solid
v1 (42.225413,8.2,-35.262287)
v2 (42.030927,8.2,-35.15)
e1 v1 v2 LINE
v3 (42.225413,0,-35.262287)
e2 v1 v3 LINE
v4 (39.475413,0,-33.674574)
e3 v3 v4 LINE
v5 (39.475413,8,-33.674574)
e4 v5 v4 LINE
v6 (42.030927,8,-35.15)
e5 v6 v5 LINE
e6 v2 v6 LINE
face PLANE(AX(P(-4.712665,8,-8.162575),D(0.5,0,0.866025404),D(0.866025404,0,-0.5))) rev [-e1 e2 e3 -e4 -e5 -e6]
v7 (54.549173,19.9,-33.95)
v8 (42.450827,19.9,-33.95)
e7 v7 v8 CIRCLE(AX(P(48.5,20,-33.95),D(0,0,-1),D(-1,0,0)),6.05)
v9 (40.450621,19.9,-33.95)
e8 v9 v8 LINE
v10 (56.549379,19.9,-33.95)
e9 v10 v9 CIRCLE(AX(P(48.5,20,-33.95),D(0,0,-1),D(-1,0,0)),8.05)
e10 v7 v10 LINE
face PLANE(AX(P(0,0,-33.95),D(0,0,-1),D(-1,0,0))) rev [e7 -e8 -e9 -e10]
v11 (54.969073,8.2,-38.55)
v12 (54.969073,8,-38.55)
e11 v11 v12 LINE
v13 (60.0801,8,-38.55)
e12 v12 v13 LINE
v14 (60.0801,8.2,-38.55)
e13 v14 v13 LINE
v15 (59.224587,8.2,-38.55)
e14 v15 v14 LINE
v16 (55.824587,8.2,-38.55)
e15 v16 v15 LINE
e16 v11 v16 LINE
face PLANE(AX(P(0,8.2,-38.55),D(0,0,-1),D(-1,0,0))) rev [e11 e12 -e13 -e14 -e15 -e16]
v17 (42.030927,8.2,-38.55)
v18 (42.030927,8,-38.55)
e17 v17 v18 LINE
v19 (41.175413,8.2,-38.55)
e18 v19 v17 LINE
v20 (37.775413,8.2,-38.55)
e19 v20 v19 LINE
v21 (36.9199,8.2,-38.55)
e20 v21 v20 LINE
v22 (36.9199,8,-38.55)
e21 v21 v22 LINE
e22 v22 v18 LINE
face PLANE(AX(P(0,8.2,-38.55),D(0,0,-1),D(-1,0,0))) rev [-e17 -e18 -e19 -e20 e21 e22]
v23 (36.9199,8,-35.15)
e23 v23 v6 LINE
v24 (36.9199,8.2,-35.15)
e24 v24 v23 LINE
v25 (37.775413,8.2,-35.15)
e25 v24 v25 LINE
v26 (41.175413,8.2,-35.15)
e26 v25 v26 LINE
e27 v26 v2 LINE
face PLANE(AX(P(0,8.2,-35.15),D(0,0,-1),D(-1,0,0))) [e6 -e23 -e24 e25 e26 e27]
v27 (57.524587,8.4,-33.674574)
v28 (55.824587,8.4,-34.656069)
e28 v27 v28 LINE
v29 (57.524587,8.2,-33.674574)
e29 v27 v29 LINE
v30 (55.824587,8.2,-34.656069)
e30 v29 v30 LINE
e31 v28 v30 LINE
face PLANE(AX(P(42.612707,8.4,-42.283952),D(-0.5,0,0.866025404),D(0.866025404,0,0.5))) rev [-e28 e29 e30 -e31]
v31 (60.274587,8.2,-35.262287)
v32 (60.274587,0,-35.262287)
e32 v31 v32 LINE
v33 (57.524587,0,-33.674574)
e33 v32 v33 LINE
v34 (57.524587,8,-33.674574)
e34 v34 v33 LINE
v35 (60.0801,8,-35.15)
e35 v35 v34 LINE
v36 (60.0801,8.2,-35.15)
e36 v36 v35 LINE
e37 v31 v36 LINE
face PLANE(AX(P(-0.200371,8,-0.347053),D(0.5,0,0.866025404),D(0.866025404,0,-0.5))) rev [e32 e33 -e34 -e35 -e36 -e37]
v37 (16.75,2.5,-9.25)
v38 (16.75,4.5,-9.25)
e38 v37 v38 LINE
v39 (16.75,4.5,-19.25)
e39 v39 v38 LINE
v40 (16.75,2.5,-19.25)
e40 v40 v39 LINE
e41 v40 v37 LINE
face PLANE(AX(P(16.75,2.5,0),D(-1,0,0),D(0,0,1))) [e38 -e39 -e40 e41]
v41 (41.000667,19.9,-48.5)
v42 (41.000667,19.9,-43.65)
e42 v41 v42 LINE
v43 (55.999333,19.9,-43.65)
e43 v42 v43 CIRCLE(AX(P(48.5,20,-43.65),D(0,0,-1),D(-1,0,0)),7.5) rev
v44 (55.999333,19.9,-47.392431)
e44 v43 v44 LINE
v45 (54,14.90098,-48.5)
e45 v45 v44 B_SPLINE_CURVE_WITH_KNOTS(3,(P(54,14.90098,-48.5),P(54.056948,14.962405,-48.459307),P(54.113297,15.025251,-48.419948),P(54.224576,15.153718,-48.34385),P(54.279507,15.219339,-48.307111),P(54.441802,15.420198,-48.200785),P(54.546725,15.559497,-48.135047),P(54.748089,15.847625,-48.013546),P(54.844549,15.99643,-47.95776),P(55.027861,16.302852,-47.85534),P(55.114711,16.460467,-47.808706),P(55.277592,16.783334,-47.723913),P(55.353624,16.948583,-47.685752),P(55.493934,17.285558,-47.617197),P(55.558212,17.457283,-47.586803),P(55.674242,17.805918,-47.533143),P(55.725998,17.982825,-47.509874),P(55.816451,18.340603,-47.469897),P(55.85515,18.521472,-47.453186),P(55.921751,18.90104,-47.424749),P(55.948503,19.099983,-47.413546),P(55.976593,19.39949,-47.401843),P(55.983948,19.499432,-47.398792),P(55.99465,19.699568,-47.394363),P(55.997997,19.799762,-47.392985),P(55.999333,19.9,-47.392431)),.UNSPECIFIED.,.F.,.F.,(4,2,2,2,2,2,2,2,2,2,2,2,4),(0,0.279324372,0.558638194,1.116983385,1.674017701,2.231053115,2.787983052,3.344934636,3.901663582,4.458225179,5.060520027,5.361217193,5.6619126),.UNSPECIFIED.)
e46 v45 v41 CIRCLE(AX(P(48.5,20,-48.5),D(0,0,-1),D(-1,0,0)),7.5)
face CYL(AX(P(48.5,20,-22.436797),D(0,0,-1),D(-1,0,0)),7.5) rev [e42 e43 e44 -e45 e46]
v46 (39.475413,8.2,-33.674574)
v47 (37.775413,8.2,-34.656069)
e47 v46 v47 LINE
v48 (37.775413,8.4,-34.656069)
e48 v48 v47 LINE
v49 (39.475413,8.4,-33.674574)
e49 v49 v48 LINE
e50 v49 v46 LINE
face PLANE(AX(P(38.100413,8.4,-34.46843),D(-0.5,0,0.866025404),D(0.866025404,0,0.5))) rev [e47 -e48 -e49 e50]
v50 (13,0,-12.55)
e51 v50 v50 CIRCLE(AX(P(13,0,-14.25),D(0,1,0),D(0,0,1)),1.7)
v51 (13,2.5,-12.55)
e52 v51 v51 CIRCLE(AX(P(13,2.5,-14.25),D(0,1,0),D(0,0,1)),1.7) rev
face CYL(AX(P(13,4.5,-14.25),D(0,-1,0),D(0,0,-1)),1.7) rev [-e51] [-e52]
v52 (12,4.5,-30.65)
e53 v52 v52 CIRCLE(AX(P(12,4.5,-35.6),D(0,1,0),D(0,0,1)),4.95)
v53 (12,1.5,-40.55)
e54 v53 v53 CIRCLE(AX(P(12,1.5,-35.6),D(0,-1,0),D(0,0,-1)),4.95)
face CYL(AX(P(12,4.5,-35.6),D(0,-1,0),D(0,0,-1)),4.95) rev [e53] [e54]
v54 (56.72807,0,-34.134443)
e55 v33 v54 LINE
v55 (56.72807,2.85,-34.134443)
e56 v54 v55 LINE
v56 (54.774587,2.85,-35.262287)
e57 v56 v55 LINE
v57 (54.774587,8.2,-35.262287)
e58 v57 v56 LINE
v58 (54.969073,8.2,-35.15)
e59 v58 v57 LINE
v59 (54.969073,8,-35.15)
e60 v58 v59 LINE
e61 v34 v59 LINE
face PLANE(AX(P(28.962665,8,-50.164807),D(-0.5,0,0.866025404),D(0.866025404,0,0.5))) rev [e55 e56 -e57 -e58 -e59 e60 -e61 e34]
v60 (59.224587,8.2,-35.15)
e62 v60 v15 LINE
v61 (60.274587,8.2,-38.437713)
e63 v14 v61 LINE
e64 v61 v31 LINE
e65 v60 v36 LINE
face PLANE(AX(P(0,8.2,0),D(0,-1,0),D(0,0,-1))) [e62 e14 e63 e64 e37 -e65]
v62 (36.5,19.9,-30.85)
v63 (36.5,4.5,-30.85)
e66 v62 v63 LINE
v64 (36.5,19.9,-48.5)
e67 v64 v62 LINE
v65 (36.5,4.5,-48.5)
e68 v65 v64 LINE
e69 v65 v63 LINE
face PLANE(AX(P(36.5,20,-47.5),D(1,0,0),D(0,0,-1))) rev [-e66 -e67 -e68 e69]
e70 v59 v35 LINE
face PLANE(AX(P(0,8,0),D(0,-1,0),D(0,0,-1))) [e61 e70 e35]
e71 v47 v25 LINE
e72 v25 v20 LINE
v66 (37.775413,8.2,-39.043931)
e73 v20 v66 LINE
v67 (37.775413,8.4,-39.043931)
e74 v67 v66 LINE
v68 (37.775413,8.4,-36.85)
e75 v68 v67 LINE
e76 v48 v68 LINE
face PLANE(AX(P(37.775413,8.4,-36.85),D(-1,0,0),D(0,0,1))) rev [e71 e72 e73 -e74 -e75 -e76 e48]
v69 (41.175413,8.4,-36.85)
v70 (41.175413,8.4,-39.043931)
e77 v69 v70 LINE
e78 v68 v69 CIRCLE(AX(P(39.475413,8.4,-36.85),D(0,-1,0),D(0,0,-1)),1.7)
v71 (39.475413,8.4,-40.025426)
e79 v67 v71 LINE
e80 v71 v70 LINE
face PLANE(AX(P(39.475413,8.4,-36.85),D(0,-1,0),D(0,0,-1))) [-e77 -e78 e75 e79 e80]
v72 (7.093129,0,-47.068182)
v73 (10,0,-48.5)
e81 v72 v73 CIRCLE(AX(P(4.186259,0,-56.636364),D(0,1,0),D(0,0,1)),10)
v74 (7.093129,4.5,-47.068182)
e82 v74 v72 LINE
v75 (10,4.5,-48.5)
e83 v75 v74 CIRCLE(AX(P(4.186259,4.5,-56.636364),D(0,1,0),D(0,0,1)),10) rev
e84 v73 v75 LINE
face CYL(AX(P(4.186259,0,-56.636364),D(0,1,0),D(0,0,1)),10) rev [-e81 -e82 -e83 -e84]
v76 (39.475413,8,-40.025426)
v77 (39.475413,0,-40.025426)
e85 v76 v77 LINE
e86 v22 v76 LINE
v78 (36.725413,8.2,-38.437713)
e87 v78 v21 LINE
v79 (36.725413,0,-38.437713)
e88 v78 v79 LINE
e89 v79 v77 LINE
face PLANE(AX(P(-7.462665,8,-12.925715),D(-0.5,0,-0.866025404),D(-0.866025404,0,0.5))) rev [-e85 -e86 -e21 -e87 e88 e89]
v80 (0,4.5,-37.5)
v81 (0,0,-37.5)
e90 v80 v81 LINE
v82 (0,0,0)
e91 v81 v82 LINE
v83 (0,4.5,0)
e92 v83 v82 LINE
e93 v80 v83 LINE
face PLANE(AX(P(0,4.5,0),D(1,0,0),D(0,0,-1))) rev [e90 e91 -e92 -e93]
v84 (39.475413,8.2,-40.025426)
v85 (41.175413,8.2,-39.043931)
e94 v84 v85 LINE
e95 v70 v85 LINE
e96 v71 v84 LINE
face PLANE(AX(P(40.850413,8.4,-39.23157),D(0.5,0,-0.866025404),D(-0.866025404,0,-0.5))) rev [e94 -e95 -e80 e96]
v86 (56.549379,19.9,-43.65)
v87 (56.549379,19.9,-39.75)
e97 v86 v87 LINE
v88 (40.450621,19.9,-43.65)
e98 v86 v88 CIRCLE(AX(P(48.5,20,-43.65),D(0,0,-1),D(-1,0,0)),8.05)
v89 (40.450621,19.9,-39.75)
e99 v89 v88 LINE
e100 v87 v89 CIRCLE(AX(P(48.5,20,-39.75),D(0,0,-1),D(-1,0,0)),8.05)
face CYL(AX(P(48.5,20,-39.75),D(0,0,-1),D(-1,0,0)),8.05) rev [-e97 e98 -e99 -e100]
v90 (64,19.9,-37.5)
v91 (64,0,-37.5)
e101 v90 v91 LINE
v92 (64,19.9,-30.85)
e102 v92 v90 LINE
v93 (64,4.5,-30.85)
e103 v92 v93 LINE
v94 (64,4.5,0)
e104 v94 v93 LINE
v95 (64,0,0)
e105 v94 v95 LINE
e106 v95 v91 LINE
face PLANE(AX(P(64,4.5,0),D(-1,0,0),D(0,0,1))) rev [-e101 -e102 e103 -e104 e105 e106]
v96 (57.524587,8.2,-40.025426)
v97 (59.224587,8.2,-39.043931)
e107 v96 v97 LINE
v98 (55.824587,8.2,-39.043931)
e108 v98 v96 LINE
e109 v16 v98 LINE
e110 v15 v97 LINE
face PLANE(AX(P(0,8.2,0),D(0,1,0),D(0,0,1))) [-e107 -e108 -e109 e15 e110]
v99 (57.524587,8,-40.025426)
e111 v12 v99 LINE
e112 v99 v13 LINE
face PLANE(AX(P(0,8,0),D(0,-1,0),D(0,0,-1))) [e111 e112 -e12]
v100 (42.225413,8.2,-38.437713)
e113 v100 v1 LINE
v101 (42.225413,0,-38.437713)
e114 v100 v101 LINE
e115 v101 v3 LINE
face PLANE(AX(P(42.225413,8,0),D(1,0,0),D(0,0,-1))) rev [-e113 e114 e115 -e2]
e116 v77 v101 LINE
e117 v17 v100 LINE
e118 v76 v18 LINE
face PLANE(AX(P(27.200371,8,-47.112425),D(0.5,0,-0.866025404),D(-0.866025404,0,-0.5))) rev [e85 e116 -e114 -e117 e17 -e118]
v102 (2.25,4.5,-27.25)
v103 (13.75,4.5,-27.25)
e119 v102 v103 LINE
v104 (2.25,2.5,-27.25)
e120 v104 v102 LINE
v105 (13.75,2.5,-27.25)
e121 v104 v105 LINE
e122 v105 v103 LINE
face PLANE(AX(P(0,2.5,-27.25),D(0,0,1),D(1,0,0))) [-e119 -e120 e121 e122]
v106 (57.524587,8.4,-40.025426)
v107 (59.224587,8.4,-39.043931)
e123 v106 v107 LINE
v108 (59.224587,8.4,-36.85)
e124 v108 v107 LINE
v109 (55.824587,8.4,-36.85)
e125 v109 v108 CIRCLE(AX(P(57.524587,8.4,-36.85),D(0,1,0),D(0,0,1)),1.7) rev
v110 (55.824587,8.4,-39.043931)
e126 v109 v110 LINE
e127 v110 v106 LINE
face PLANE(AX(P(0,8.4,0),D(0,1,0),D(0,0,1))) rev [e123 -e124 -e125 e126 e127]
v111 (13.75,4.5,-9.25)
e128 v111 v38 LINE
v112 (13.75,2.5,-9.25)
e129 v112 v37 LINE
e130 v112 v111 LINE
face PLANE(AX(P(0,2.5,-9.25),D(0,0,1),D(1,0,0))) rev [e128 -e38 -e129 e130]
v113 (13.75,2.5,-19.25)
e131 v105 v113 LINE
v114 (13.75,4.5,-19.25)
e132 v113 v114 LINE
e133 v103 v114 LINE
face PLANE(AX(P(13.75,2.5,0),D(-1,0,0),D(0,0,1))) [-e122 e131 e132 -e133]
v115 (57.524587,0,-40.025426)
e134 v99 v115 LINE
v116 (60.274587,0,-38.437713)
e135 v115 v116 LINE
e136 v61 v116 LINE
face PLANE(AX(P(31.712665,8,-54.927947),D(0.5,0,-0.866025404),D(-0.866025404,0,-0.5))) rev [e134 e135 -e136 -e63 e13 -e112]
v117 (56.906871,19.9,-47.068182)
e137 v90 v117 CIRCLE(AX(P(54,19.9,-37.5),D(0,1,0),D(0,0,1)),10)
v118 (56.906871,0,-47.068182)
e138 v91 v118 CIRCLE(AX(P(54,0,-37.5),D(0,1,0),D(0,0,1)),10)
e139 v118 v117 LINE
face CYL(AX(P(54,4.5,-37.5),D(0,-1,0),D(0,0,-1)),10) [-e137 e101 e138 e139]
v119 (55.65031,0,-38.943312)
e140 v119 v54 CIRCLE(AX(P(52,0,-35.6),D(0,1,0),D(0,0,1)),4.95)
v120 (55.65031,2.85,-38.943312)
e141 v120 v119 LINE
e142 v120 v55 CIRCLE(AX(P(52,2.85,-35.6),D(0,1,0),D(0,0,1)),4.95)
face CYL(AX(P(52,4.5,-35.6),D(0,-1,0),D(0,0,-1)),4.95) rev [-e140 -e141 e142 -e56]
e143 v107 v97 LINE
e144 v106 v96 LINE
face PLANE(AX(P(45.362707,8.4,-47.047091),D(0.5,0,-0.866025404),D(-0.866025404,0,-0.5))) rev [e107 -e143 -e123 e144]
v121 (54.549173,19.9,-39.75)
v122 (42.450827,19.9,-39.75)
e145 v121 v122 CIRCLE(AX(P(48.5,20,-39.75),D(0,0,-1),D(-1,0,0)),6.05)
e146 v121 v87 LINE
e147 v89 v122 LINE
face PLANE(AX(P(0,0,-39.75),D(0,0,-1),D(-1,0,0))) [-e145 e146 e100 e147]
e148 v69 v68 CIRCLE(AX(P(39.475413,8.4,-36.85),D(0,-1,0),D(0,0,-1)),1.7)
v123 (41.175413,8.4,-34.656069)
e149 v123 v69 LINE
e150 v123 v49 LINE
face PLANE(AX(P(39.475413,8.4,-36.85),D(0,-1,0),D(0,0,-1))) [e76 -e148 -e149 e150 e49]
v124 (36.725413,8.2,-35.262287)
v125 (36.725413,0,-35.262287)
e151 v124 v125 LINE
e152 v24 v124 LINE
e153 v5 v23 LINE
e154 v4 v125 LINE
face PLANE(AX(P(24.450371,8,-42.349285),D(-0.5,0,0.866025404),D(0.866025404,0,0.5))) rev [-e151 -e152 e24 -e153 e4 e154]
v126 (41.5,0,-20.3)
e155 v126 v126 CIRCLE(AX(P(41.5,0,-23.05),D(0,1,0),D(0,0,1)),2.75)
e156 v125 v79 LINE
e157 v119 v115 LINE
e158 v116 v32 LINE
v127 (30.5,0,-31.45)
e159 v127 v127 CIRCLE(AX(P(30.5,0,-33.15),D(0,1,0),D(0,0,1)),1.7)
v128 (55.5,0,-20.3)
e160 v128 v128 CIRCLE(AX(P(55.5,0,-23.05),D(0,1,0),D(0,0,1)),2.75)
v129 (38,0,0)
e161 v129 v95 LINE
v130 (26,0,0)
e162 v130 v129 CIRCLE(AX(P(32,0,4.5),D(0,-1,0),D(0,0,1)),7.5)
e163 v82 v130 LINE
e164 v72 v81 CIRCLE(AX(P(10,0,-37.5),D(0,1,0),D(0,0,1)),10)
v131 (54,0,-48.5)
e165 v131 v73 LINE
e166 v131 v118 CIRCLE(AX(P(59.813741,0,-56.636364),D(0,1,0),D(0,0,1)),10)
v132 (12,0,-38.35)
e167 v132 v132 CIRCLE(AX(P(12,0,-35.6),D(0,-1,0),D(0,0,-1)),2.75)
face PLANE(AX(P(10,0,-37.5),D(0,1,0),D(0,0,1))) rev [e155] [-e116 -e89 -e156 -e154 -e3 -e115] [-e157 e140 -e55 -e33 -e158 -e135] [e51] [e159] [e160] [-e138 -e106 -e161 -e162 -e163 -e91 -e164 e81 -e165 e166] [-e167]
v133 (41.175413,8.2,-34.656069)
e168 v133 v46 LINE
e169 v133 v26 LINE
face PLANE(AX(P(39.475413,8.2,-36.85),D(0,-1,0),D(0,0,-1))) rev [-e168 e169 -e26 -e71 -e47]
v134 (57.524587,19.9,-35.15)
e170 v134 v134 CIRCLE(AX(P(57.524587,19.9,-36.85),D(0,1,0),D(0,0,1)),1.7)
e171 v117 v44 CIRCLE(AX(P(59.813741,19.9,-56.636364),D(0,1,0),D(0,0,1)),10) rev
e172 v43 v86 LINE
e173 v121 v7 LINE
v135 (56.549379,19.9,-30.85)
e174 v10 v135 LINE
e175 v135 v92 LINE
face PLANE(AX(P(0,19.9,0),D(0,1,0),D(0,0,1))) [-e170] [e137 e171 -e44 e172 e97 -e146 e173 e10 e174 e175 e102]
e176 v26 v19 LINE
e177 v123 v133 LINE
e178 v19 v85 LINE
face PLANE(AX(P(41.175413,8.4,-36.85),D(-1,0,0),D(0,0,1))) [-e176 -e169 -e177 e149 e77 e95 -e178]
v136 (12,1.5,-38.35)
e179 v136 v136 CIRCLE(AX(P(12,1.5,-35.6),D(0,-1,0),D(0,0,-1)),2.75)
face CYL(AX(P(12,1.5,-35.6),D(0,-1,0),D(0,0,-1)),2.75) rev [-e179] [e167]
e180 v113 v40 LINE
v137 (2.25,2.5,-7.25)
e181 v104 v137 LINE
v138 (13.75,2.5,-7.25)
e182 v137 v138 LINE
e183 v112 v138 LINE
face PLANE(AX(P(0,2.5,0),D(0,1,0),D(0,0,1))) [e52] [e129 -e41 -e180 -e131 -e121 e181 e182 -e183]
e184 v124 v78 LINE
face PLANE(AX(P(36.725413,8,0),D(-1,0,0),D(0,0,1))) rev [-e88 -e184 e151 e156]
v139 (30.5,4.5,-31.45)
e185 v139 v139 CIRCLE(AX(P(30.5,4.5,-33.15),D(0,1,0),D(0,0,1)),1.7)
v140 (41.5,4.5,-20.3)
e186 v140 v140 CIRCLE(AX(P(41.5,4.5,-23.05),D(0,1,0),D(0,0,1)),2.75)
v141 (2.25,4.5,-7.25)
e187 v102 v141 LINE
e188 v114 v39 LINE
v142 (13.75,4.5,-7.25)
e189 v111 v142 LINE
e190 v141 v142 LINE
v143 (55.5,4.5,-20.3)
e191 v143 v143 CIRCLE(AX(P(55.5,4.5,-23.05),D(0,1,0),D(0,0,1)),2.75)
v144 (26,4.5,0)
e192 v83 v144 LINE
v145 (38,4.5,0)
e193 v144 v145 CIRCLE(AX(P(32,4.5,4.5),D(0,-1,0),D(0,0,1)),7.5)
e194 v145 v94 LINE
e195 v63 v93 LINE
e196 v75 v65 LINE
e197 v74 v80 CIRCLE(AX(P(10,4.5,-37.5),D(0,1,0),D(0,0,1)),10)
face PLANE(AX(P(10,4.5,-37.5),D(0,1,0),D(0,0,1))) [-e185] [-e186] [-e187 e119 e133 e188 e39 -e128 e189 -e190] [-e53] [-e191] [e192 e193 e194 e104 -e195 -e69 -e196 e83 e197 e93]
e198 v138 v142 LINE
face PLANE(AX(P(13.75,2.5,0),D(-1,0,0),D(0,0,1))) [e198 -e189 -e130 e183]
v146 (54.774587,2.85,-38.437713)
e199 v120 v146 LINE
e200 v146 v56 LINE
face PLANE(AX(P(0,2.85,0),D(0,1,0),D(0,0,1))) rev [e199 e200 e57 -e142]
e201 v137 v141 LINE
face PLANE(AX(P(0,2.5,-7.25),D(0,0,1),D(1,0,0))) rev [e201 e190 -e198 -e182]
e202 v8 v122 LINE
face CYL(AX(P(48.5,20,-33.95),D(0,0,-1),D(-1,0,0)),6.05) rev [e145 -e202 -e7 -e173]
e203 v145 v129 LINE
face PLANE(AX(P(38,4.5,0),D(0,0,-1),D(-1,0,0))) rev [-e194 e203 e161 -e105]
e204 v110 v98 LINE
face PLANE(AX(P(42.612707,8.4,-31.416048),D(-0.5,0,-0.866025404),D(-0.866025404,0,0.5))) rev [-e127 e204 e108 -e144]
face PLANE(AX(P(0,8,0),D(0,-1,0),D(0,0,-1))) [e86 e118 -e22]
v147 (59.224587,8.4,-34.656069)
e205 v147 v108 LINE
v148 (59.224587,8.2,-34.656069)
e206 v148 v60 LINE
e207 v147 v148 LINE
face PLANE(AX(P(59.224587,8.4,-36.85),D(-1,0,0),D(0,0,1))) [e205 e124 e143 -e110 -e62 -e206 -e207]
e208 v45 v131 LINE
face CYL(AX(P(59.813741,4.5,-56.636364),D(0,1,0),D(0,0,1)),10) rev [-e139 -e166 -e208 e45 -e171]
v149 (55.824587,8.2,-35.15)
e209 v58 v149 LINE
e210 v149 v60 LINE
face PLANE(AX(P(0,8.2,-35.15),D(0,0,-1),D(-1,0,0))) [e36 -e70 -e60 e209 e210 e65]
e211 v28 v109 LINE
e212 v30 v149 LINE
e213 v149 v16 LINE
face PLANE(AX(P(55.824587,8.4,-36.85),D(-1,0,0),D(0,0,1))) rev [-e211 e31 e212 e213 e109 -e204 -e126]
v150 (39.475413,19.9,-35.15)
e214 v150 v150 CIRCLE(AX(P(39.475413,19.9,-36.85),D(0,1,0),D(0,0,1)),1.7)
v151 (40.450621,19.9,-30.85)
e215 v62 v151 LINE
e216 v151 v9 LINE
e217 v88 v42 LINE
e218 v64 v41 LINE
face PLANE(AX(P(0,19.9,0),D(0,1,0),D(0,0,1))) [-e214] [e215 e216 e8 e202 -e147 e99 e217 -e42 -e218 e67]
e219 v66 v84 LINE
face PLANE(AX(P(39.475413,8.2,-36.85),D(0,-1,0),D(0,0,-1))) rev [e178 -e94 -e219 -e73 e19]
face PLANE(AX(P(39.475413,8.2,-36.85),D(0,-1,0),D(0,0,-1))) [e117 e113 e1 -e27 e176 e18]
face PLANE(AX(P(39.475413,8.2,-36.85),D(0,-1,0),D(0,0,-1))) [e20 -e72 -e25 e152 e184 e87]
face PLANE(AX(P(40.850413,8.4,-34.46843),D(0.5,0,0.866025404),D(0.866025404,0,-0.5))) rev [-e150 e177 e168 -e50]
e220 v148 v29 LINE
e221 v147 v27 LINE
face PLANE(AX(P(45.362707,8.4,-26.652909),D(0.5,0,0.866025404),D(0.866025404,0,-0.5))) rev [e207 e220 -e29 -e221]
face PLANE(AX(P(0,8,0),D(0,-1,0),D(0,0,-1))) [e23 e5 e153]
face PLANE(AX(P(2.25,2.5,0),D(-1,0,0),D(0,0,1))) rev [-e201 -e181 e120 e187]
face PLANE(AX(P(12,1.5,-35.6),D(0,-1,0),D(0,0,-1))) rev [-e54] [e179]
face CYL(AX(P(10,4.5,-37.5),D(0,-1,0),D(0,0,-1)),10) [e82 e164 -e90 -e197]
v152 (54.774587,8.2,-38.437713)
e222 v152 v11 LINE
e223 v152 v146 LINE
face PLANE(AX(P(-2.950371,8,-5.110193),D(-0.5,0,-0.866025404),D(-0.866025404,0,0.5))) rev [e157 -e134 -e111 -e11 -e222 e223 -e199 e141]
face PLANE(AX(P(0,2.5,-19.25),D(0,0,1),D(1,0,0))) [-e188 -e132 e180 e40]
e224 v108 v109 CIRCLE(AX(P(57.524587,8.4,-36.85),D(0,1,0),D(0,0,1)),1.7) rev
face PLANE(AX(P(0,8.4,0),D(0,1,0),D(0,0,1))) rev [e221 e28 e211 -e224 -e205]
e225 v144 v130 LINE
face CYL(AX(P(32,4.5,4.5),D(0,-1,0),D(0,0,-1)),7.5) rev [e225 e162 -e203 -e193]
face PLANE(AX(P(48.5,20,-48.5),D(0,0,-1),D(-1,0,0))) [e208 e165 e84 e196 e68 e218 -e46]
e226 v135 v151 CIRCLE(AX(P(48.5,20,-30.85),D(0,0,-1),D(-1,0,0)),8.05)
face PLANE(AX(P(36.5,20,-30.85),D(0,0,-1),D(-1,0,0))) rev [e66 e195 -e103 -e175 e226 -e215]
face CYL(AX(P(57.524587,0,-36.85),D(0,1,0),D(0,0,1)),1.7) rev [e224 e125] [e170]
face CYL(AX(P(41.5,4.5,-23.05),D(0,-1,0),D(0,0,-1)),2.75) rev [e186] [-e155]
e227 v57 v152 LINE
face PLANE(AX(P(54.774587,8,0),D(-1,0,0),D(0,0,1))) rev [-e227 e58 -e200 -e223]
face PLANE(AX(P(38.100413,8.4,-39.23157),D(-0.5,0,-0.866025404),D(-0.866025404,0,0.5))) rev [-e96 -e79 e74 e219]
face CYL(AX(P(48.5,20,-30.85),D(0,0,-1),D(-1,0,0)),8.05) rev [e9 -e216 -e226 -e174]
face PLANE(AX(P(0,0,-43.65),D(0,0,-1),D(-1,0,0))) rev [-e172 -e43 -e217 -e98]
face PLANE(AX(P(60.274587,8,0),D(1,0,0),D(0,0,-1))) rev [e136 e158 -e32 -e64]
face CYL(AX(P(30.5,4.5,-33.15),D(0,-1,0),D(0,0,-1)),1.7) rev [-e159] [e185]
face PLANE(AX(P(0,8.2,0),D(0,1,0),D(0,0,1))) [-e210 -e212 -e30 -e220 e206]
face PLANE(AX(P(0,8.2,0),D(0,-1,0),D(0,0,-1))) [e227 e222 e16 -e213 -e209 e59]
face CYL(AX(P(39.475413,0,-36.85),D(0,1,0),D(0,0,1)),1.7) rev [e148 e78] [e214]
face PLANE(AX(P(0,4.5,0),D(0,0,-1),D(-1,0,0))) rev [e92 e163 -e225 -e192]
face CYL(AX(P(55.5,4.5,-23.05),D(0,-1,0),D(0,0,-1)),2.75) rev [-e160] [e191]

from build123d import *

# Parameters (mm, degrees)
SKETCH4_R           = 4.95
SKETCH4_R_2         = 2.75
SKETCH4_R_3         = 1.7
BOSS_EXTRUDE1_DEPTH = 4.5
BOSS_EXTRUDE2_START = 2.85
SKETCH4_2_R         = 4.95
BOSS_EXTRUDE2_DEPTH = 1.65
BOSS_EXTRUDE3_DEPTH = 15.5
CUT_EXTRUDE1_DEPTH  = 3.85
CUT_EXTRUDE2_START  = -3.85
SKETCH7_3_R         = 8.05
CUT_EXTRUDE2_DEPTH  = 3.9
CUT_EXTRUDE4_START  = -7.75
CUT_EXTRUDE4_DEPTH  = 5.8
CUT_EXTRUDE5_START  = -13.55
SKETCH7_5_R         = 8.05
CUT_EXTRUDE5_DEPTH  = 3.1
SKETCH8_W           = 24
SKETCH8_H           = 16.65
CUT_EXTRUDE6_DEPTH  = 0.1
SKETCH9_R           = 1.7
CUT_EXTRUDE7_DEPTH  = 83.1477938
SKETCH13_R          = 4.95
SKETCH13_R_2        = 2.75
BOSS_EXTRUDE5_DEPTH = 1.5
CUT_EXTRUDE12_START = -8
SKETCH14_R          = 1.7
CUT_EXTRUDE12_DEPTH = 8
CUT_EXTRUDE13_START = -8.2
CUT_EXTRUDE13_DEPTH = 0.2
CUT_EXTRUDE14_START = -8.4
CUT_EXTRUDE14_DEPTH = 0.2
BOSS_EXTRUDE6_DEPTH = 15.4
BOSS_EXTRUDE8_START = 1
BOSS_EXTRUDE8_DEPTH = 1
FILLET1_R           = 10
CUT_EXTRUDE15_START = -2
SKETCH18_R          = 1.7
SKETCH18_W          = 11.5
SKETCH18_H          = 20
CUT_EXTRUDE15_DEPTH = 2
CUT_EXTRUDE16_START = -4.85
SKETCH19_R          = 7.5
CUT_EXTRUDE16_DEPTH = 4.85


with BuildPart() as part:
    # Sketch4 → Boss-Extrude1 (new body)
    with BuildSketch(Plane(origin=(0, 0, 0), x_dir=(1, 0, 0), z_dir=(0, 1, 0))):
        with BuildLine():
            Line((0, 0), (26, 0))
            ThreePointArc((26, 0), (32, 3), (38, 0))
            Line((38, 0), (64, 0))
            Line((64, 0), (64, 37.5))
            ThreePointArc((64, 37.5), (61.071067812, 44.571067812), (54, 47.5))
            Line((54, 47.5), (10, 47.5))
            ThreePointArc((10, 47.5), (2.928932188, 44.571067812), (0, 37.5))
            Line((0, 37.5), (0, 0))
        make_face()
        with Locations(Location((12, 35.6, 0), (0, 0, 270))):
            Circle(SKETCH4_R, mode=Mode.SUBTRACT)
        with Locations(Location((52, 35.6, 0), (0, 0, 270))):
            Circle(SKETCH4_R, mode=Mode.SUBTRACT)
        with Locations(Location((41.5, 23.05, 0), (0, 0, 270))):
            Circle(SKETCH4_R_2, mode=Mode.SUBTRACT)
        with Locations(Location((55.5, 23.05, 0), (0, 0, 270))):
            Circle(SKETCH4_R_2, mode=Mode.SUBTRACT)
        with Locations(Location((13, 14.25, 0), (0, 0, 270))):
            Circle(SKETCH4_R_3, mode=Mode.SUBTRACT)
        with Locations(Location((30.5, 33.15, 0), (0, 0, 270))):
            Circle(SKETCH4_R_3, mode=Mode.SUBTRACT)
    extrude(amount=BOSS_EXTRUDE1_DEPTH)

    # Sketch4<2> → Boss-Extrude2 (add)
    with BuildSketch(Plane(origin=(0, 0, 0), x_dir=(1, 0, 0), z_dir=(0, 1, 0)).offset(BOSS_EXTRUDE2_START)):
        with Locations(Location((52, 35.6, 0), (0, 0, 270))):
            Circle(SKETCH4_2_R)
    extrude(amount=BOSS_EXTRUDE2_DEPTH)

    # Sketch6 → Boss-Extrude3 (add)
    with BuildSketch(Plane(origin=(0, 4.5, 0), x_dir=(1, 0, 0), z_dir=(0, 1, 0))):
        with BuildLine():
            Line((36.5, 47.5), (54, 47.5))
            ThreePointArc((54, 47.5), (57.464576398, 46.880656181), (60.5, 45.099342077))
            Line((60.5, 45.099342077), (60.5, 30.85))
            Line((60.5, 30.85), (36.5, 30.85))
            Line((36.5, 30.85), (36.5, 47.5))
        make_face()
    extrude(amount=BOSS_EXTRUDE3_DEPTH)

    # Sketch7 → Cut-Extrude1 (cut)
    with BuildSketch(Plane(origin=(0, 0, -47.5), x_dir=(-1, 0, 0), z_dir=(0, 0, -1))):
        with BuildLine():
            Line((-42.45, 20), (-54, 20))
            Line((-54, 20), (-54, 17.479583368))
            ThreePointArc((-54, 17.479583368), (-47.210135666, 14.089099053), (-42.45, 20))
        make_face()
        with BuildLine():
            Line((-54, 17.479583368), (-54, 20))
            Line((-54, 20), (-54.55, 20))
            ThreePointArc((-54.55, 20), (-54.410900947, 18.710135666), (-54, 17.479583368))
        make_face()
        with BuildLine():
            Line((-42.45, 20), (-54, 20))
            Line((-54, 20), (-54, 17.479583368))
            ThreePointArc((-54, 17.479583368), (-47.210135666, 14.089099053), (-42.45, 20))
        make_face()
    extrude(amount=-CUT_EXTRUDE1_DEPTH, mode=Mode.SUBTRACT)

    # Sketch7<3> → Cut-Extrude2 (cut)
    with BuildSketch(Plane(origin=(0, 0, -47.5), x_dir=(-1, 0, 0), z_dir=(0, 0, -1)).offset(CUT_EXTRUDE2_START)):
        with Locations((-48.5, 20)):
            Circle(SKETCH7_3_R)
    extrude(amount=-CUT_EXTRUDE2_DEPTH, mode=Mode.SUBTRACT)

    # Sketch7<4> → Cut-Extrude4 (cut)
    with BuildSketch(Plane(origin=(0, 0, -47.5), x_dir=(-1, 0, 0), z_dir=(0, 0, -1)).offset(CUT_EXTRUDE4_START)):
        with BuildLine():
            Line((-42.45, 20), (-54, 20))
            Line((-54, 20), (-54, 17.479583368))
            ThreePointArc((-54, 17.479583368), (-47.210135666, 14.089099053), (-42.45, 20))
        make_face()
        with BuildLine():
            Line((-54, 17.479583368), (-54, 20))
            Line((-54, 20), (-54.55, 20))
            ThreePointArc((-54.55, 20), (-54.410900947, 18.710135666), (-54, 17.479583368))
        make_face()
        with BuildLine():
            Line((-42.45, 20), (-54, 20))
            Line((-54, 20), (-54, 17.479583368))
            ThreePointArc((-54, 17.479583368), (-47.210135666, 14.089099053), (-42.45, 20))
        make_face()
    extrude(amount=-CUT_EXTRUDE4_DEPTH, mode=Mode.SUBTRACT)

    # Sketch7<5> → Cut-Extrude5 (cut)
    with BuildSketch(Plane(origin=(0, 0, -47.5), x_dir=(-1, 0, 0), z_dir=(0, 0, -1)).offset(CUT_EXTRUDE5_START)):
        with Locations((-48.5, 20)):
            Circle(SKETCH7_5_R)
    extrude(amount=-CUT_EXTRUDE5_DEPTH, mode=Mode.SUBTRACT)

    # Sketch8 → Cut-Extrude6 (cut)
    with BuildSketch(Plane(origin=(0, 20, 0), x_dir=(1, 0, 0), z_dir=(0, 1, 0))):
        with Locations((48.5, 39.175)):
            Rectangle(SKETCH8_W, SKETCH8_H)
    extrude(amount=-CUT_EXTRUDE6_DEPTH, mode=Mode.SUBTRACT)

    # Sketch9 → Cut-Extrude7 (cut, through all)
    with BuildSketch(Plane(origin=(0, 19.9, 0), x_dir=(1, 0, 0), z_dir=(0, 1, 0))):
        with Locations(Location((39.475413251, 36.85, 0), (0, 0, 270))):
            Circle(SKETCH9_R)
        with Locations(Location((57.524586749, 36.85, 0), (0, 0, 270))):
            Circle(SKETCH9_R)
    extrude(amount=-CUT_EXTRUDE7_DEPTH, mode=Mode.SUBTRACT)

    # Sketch13 → Boss-Extrude5 (add)
    with BuildSketch(Plane.XZ):
        with Locations(Location((12, -35.6, 0), (0, 0, 270))):
            Circle(SKETCH13_R)
        with Locations(Location((12, -35.6, 0), (0, 0, 270))):
            Circle(SKETCH13_R_2, mode=Mode.SUBTRACT)
    extrude(amount=-BOSS_EXTRUDE5_DEPTH)

    # Sketch14 → Cut-Extrude12 (cut)
    with BuildSketch(Plane.XZ.offset(CUT_EXTRUDE12_START)):
        with Locations(Location((39.475413251, -36.85, 0), (0, 0, 90))):
            Circle(SKETCH14_R)
        Polygon((41.175413251, -35.15), (41.175413251, -34.656068977), (39.475413251, -33.674573519), (37.775413251, -34.656068977), (37.775413251, -35.15), (39.475413251, -35.15), align=None)
        with BuildLine():
            Line((41.175413251, -36.85), (41.175413251, -35.15))
            Line((41.175413251, -35.15), (39.475413251, -35.15))
            ThreePointArc((39.475413251, -35.15), (40.677494779, -35.647918472), (41.175413251, -36.85))
        make_face()
        Polygon((41.175413251, -35.15), (42.030926879, -35.15), (41.175413251, -34.656068977), align=None)
        Polygon((42.030926879, -38.55), (42.225413251, -38.43771324), (42.225413251, -35.26228676), (42.030926879, -35.15), (41.175413251, -35.15), (41.175413251, -36.85), (41.175413251, -38.55), align=None)
        Polygon((41.175413251, -39.043931023), (42.030926879, -38.55), (41.175413251, -38.55), align=None)
        Polygon((39.475413251, -40.025426481), (41.175413251, -39.043931023), (41.175413251, -38.55), (39.475413251, -38.55), (37.775413251, -38.55), (37.775413251, -39.043931023), align=None)
        with BuildLine():
            Line((39.475413251, -38.55), (41.175413251, -38.55))
            Line((41.175413251, -38.55), (41.175413251, -36.85))
            ThreePointArc((41.175413251, -36.85), (40.677494779, -38.052081528), (39.475413251, -38.55))
        make_face()
        with BuildLine():
            Line((37.775413251, -38.55), (39.475413251, -38.55))
            ThreePointArc((39.475413251, -38.55), (38.273331723, -38.052081528), (37.775413251, -36.85))
            Line((37.775413251, -36.85), (37.775413251, -38.55))
        make_face()
        Polygon((36.919899624, -38.55), (37.775413251, -39.043931023), (37.775413251, -38.55), align=None)
        Polygon((36.919899624, -38.55), (37.775413251, -38.55), (37.775413251, -36.85), (37.775413251, -35.15), (36.919899624, -35.15), (36.725413251, -35.26228676), (36.725413251, -38.43771324), align=None)
        Polygon((37.775413251, -35.15), (37.775413251, -34.656068977), (36.919899624, -35.15), align=None)
        with BuildLine():
            ThreePointArc((37.775413251, -36.85), (38.273331723, -35.647918472), (39.475413251, -35.15))
            Line((39.475413251, -35.15), (37.775413251, -35.15))
            Line((37.775413251, -35.15), (37.775413251, -36.85))
        make_face()
        with BuildLine():
            Line((57.524586749, -40.025426481), (59.224586749, -39.043931023))
            Line((59.224586749, -39.043931023), (59.224586749, -38.55))
            Line((59.224586749, -38.55), (57.524586749, -38.55))
            Line((57.524586749, -38.55), (55.974921383, -38.55))
            ThreePointArc((55.974921383, -38.55), (55.90094113, -38.647155772), (55.824586749, -38.742457033))
            Line((55.824586749, -38.742457033), (55.824586749, -39.043931023))
            Line((55.824586749, -39.043931023), (57.524586749, -40.025426481))
        make_face()
        Polygon((59.224586749, -39.043931023), (60.080100376, -38.55), (59.224586749, -38.55), align=None)
        Polygon((60.080100376, -38.55), (60.274586749, -38.43771324), (60.274586749, -35.26228676), (60.080100376, -35.15), (59.224586749, -35.15), (59.224586749, -36.85), (59.224586749, -38.55), align=None)
        with BuildLine():
            Line((57.524586749, -38.55), (59.224586749, -38.55))
            Line((59.224586749, -38.55), (59.224586749, -36.85))
            ThreePointArc((59.224586749, -36.85), (58.726668277, -38.052081528), (57.524586749, -38.55))
        make_face()
        with BuildLine():
            Line((55.974921383, -38.55), (57.524586749, -38.55))
            ThreePointArc((57.524586749, -38.55), (56.864634759, -38.416672707), (56.308199961, -38.037603967))
            ThreePointArc((56.308199961, -38.037603967), (56.149477343, -38.298951237), (55.974921383, -38.55))
        make_face()
        with BuildLine():
            ThreePointArc((57.524586749, -38.55), (58.726668277, -38.052081528), (59.224586749, -36.85))
            ThreePointArc((59.224586749, -36.85), (58.726668283, -35.647918478), (57.524586766, -35.15))
            ThreePointArc((57.524586766, -35.15), (57.226643414, -35.176312523), (56.937923169, -35.254435572))
            ThreePointArc((56.937923169, -35.254435572), (56.933989419, -35.202195507), (56.929503018, -35.15))
            Line((56.929503018, -35.15), (55.824586749, -35.15))
            Line((55.824586749, -35.15), (55.824586749, -38.55))
            Line((55.824586749, -38.55), (55.974921383, -38.55))
            ThreePointArc((55.974921383, -38.55), (56.149477343, -38.298951237), (56.308199961, -38.037603967))
            ThreePointArc((56.308199961, -38.037603967), (56.864634759, -38.416672707), (57.524586749, -38.55))
        make_face()
        with BuildLine():
            ThreePointArc((55.824586749, -38.742457033), (55.90094113, -38.647155772), (55.974921383, -38.55))
            Line((55.974921383, -38.55), (55.824586749, -38.55))
            Line((55.824586749, -38.55), (55.824586749, -38.742457033))
        make_face()
        with BuildLine():
            Line((54.969073121, -38.55), (55.650309982, -38.943312285))
            ThreePointArc((55.650309982, -38.943312285), (55.738797399, -38.84405518), (55.824586749, -38.742457033))
            Line((55.824586749, -38.742457033), (55.824586749, -38.55))
            Line((55.824586749, -38.55), (54.969073121, -38.55))
        make_face()
        Polygon((54.969073121, -38.55), (55.824586749, -38.55), (55.824586749, -35.15), (54.969073121, -35.15), (54.774586749, -35.26228676), (54.774586749, -38.43771324), align=None)
        Polygon((55.824586749, -35.15), (55.824586749, -34.656068977), (54.969073121, -35.15), align=None)
        with BuildLine():
            ThreePointArc((56.929503018, -35.15), (56.855411043, -34.636940496), (56.728069624, -34.134442896))
            Line((56.728069624, -34.134442896), (55.824586749, -34.656068977))
            Line((55.824586749, -34.656068977), (55.824586749, -35.15))
            Line((55.824586749, -35.15), (56.929503018, -35.15))
        make_face()
        with BuildLine():
            ThreePointArc((56.937923169, -35.254435572), (57.226643414, -35.176312523), (57.524586766, -35.15))
            Line((57.524586766, -35.15), (56.929503018, -35.15))
            ThreePointArc((56.929503018, -35.15), (56.933989419, -35.202195507), (56.937923169, -35.254435572))
        make_face()
        with BuildLine():
            Line((59.224586749, -35.15), (59.224586749, -34.656068977))
            Line((59.224586749, -34.656068977), (57.524586749, -33.674573519))
            Line((57.524586749, -33.674573519), (56.728069624, -34.134442896))
            ThreePointArc((56.728069624, -34.134442896), (56.855411043, -34.636940496), (56.929503018, -35.15))
            Line((56.929503018, -35.15), (57.524586766, -35.15))
            Line((57.524586766, -35.15), (59.224586749, -35.15))
        make_face()
        with BuildLine():
            Line((59.224586749, -36.85), (59.224586749, -35.15))
            Line((59.224586749, -35.15), (57.524586766, -35.15))
            ThreePointArc((57.524586766, -35.15), (58.726668283, -35.647918478), (59.224586749, -36.85))
        make_face()
        Polygon((59.224586749, -35.15), (60.080100376, -35.15), (59.224586749, -34.656068977), align=None)
        with BuildLine():
            Line((55.650309982, -38.943312285), (55.824586749, -39.043931023))
            Line((55.824586749, -39.043931023), (55.824586749, -38.742457033))
            ThreePointArc((55.824586749, -38.742457033), (55.738797399, -38.84405518), (55.650309982, -38.943312285))
        make_face()
    extrude(amount=CUT_EXTRUDE12_DEPTH, mode=Mode.SUBTRACT)

    # Sketch14<3> → Cut-Extrude13 (cut)
    with BuildSketch(Plane.XZ.offset(CUT_EXTRUDE13_START)):
        Polygon((36.919899624, -38.55), (37.775413251, -38.55), (37.775413251, -36.85), (37.775413251, -35.15), (36.919899624, -35.15), (36.725413251, -35.26228676), (36.725413251, -38.43771324), align=None)
        with BuildLine():
            ThreePointArc((37.775413251, -36.85), (38.273331723, -35.647918472), (39.475413251, -35.15))
            Line((39.475413251, -35.15), (37.775413251, -35.15))
            Line((37.775413251, -35.15), (37.775413251, -36.85))
        make_face()
        with BuildLine():
            Line((41.175413251, -36.85), (41.175413251, -35.15))
            Line((41.175413251, -35.15), (39.475413251, -35.15))
            ThreePointArc((39.475413251, -35.15), (40.677494779, -35.647918472), (41.175413251, -36.85))
        make_face()
        Polygon((42.030926879, -38.55), (42.225413251, -38.43771324), (42.225413251, -35.26228676), (42.030926879, -35.15), (41.175413251, -35.15), (41.175413251, -36.85), (41.175413251, -38.55), align=None)
        with BuildLine():
            Line((39.475413251, -38.55), (41.175413251, -38.55))
            Line((41.175413251, -38.55), (41.175413251, -36.85))
            ThreePointArc((41.175413251, -36.85), (40.677494779, -38.052081528), (39.475413251, -38.55))
        make_face()
        with BuildLine():
            Line((37.775413251, -38.55), (39.475413251, -38.55))
            ThreePointArc((39.475413251, -38.55), (38.273331723, -38.052081528), (37.775413251, -36.85))
            Line((37.775413251, -36.85), (37.775413251, -38.55))
        make_face()
        Polygon((54.969073121, -38.55), (55.824586749, -38.55), (55.824586749, -35.15), (54.969073121, -35.15), (54.774586749, -35.26228676), (54.774586749, -38.43771324), align=None)
        with BuildLine():
            ThreePointArc((57.524586749, -38.55), (58.726668277, -38.052081528), (59.224586749, -36.85))
            ThreePointArc((59.224586749, -36.85), (58.726668283, -35.647918478), (57.524586766, -35.15))
            ThreePointArc((57.524586766, -35.15), (57.226643414, -35.176312523), (56.937923169, -35.254435572))
            ThreePointArc((56.937923169, -35.254435572), (56.933989419, -35.202195507), (56.929503018, -35.15))
            Line((56.929503018, -35.15), (55.824586749, -35.15))
            Line((55.824586749, -35.15), (55.824586749, -38.55))
            Line((55.824586749, -38.55), (55.974921383, -38.55))
            ThreePointArc((55.974921383, -38.55), (56.149477343, -38.298951237), (56.308199961, -38.037603967))
            ThreePointArc((56.308199961, -38.037603967), (56.864634759, -38.416672707), (57.524586749, -38.55))
        make_face()
        with BuildLine():
            ThreePointArc((56.937923169, -35.254435572), (57.226643414, -35.176312523), (57.524586766, -35.15))
            Line((57.524586766, -35.15), (56.929503018, -35.15))
            ThreePointArc((56.929503018, -35.15), (56.933989419, -35.202195507), (56.937923169, -35.254435572))
        make_face()
        with BuildLine():
            Line((59.224586749, -36.85), (59.224586749, -35.15))
            Line((59.224586749, -35.15), (57.524586766, -35.15))
            ThreePointArc((57.524586766, -35.15), (58.726668283, -35.647918478), (59.224586749, -36.85))
        make_face()
        with BuildLine():
            Line((57.524586749, -38.55), (59.224586749, -38.55))
            Line((59.224586749, -38.55), (59.224586749, -36.85))
            ThreePointArc((59.224586749, -36.85), (58.726668277, -38.052081528), (57.524586749, -38.55))
        make_face()
        with BuildLine():
            Line((55.974921383, -38.55), (57.524586749, -38.55))
            ThreePointArc((57.524586749, -38.55), (56.864634759, -38.416672707), (56.308199961, -38.037603967))
            ThreePointArc((56.308199961, -38.037603967), (56.149477343, -38.298951237), (55.974921383, -38.55))
        make_face()
        Polygon((60.080100376, -38.55), (60.274586749, -38.43771324), (60.274586749, -35.26228676), (60.080100376, -35.15), (59.224586749, -35.15), (59.224586749, -36.85), (59.224586749, -38.55), align=None)
    extrude(amount=CUT_EXTRUDE13_DEPTH, mode=Mode.SUBTRACT)

    # Sketch14<4> → Cut-Extrude14 (cut)
    with BuildSketch(Plane.XZ.offset(CUT_EXTRUDE14_START)):
        Polygon((41.175413251, -35.15), (41.175413251, -34.656068977), (39.475413251, -33.674573519), (37.775413251, -34.656068977), (37.775413251, -35.15), (39.475413251, -35.15), align=None)
        with BuildLine():
            ThreePointArc((37.775413251, -36.85), (38.273331723, -35.647918472), (39.475413251, -35.15))
            Line((39.475413251, -35.15), (37.775413251, -35.15))
            Line((37.775413251, -35.15), (37.775413251, -36.85))
        make_face()
        with BuildLine():
            Line((41.175413251, -36.85), (41.175413251, -35.15))
            Line((41.175413251, -35.15), (39.475413251, -35.15))
            ThreePointArc((39.475413251, -35.15), (40.677494779, -35.647918472), (41.175413251, -36.85))
        make_face()
        with BuildLine():
            Line((39.475413251, -38.55), (41.175413251, -38.55))
            Line((41.175413251, -38.55), (41.175413251, -36.85))
            ThreePointArc((41.175413251, -36.85), (40.677494779, -38.052081528), (39.475413251, -38.55))
        make_face()
        with BuildLine():
            Line((37.775413251, -38.55), (39.475413251, -38.55))
            ThreePointArc((39.475413251, -38.55), (38.273331723, -38.052081528), (37.775413251, -36.85))
            Line((37.775413251, -36.85), (37.775413251, -38.55))
        make_face()
        Polygon((39.475413251, -40.025426481), (41.175413251, -39.043931023), (41.175413251, -38.55), (39.475413251, -38.55), (37.775413251, -38.55), (37.775413251, -39.043931023), align=None)
        with BuildLine():
            Line((57.524586749, -40.025426481), (59.224586749, -39.043931023))
            Line((59.224586749, -39.043931023), (59.224586749, -38.55))
            Line((59.224586749, -38.55), (57.524586749, -38.55))
            Line((57.524586749, -38.55), (55.974921383, -38.55))
            ThreePointArc((55.974921383, -38.55), (55.90094113, -38.647155772), (55.824586749, -38.742457033))
            Line((55.824586749, -38.742457033), (55.824586749, -39.043931023))
            Line((55.824586749, -39.043931023), (57.524586749, -40.025426481))
        make_face()
        with BuildLine():
            ThreePointArc((55.824586749, -38.742457033), (55.90094113, -38.647155772), (55.974921383, -38.55))
            Line((55.974921383, -38.55), (55.824586749, -38.55))
            Line((55.824586749, -38.55), (55.824586749, -38.742457033))
        make_face()
        with BuildLine():
            ThreePointArc((57.524586749, -38.55), (58.726668277, -38.052081528), (59.224586749, -36.85))
            ThreePointArc((59.224586749, -36.85), (58.726668283, -35.647918478), (57.524586766, -35.15))
            ThreePointArc((57.524586766, -35.15), (57.226643414, -35.176312523), (56.937923169, -35.254435572))
            ThreePointArc((56.937923169, -35.254435572), (56.933989419, -35.202195507), (56.929503018, -35.15))
            Line((56.929503018, -35.15), (55.824586749, -35.15))
            Line((55.824586749, -35.15), (55.824586749, -38.55))
            Line((55.824586749, -38.55), (55.974921383, -38.55))
            ThreePointArc((55.974921383, -38.55), (56.149477343, -38.298951237), (56.308199961, -38.037603967))
            ThreePointArc((56.308199961, -38.037603967), (56.864634759, -38.416672707), (57.524586749, -38.55))
        make_face()
        with BuildLine():
            Line((57.524586749, -38.55), (59.224586749, -38.55))
            Line((59.224586749, -38.55), (59.224586749, -36.85))
            ThreePointArc((59.224586749, -36.85), (58.726668277, -38.052081528), (57.524586749, -38.55))
        make_face()
        with BuildLine():
            Line((55.974921383, -38.55), (57.524586749, -38.55))
            ThreePointArc((57.524586749, -38.55), (56.864634759, -38.416672707), (56.308199961, -38.037603967))
            ThreePointArc((56.308199961, -38.037603967), (56.149477343, -38.298951237), (55.974921383, -38.55))
        make_face()
        with BuildLine():
            ThreePointArc((56.937923169, -35.254435572), (57.226643414, -35.176312523), (57.524586766, -35.15))
            Line((57.524586766, -35.15), (56.929503018, -35.15))
            ThreePointArc((56.929503018, -35.15), (56.933989419, -35.202195507), (56.937923169, -35.254435572))
        make_face()
        with BuildLine():
            Line((59.224586749, -36.85), (59.224586749, -35.15))
            Line((59.224586749, -35.15), (57.524586766, -35.15))
            ThreePointArc((57.524586766, -35.15), (58.726668283, -35.647918478), (59.224586749, -36.85))
        make_face()
        with BuildLine():
            Line((59.224586749, -35.15), (59.224586749, -34.656068977))
            Line((59.224586749, -34.656068977), (57.524586749, -33.674573519))
            Line((57.524586749, -33.674573519), (56.728069624, -34.134442896))
            ThreePointArc((56.728069624, -34.134442896), (56.855411043, -34.636940496), (56.929503018, -35.15))
            Line((56.929503018, -35.15), (57.524586766, -35.15))
            Line((57.524586766, -35.15), (59.224586749, -35.15))
        make_face()
        with BuildLine():
            ThreePointArc((56.929503018, -35.15), (56.855411043, -34.636940496), (56.728069624, -34.134442896))
            Line((56.728069624, -34.134442896), (55.824586749, -34.656068977))
            Line((55.824586749, -34.656068977), (55.824586749, -35.15))
            Line((55.824586749, -35.15), (56.929503018, -35.15))
        make_face()
    extrude(amount=CUT_EXTRUDE14_DEPTH, mode=Mode.SUBTRACT)

    # Sketch15 → Boss-Extrude6 (add)
    with BuildSketch(Plane(origin=(0, 4.5, 0), x_dir=(1, 0, 0), z_dir=(0, 1, 0))):
        with BuildLine():
            Line((60.5, 30.85), (64, 30.85))
            Line((64, 30.85), (64, 37.5))
            ThreePointArc((64, 37.5), (63.082951062, 41.683300133), (60.5, 45.099342077))
            Line((60.5, 45.099342077), (60.5, 30.85))
        make_face()
    extrude(amount=BOSS_EXTRUDE6_DEPTH)

    # Sketch17 → Boss-Extrude8 (add)
    with BuildSketch(Plane(origin=(0, 0, -47.5), x_dir=(-1, 0, 0), z_dir=(0, 0, -1)).offset(BOSS_EXTRUDE8_START)):
        with BuildLine():
            Line((-36.5, 19.9), (-42.450826503, 19.9))
            ThreePointArc((-42.450826503, 19.9), (-47.259031809, 14.078640532), (-54, 17.479583368))
            Line((-54, 17.479583368), (-54, 0))
            Line((-54, 0), (-10, 0))
            Line((-10, 0), (-10, 4.5))
            Line((-10, 4.5), (-36.5, 4.5))
            Line((-36.5, 4.5), (-36.5, 19.9))
        make_face()
    extrude(amount=-BOSS_EXTRUDE8_DEPTH)

    # Fillet1
    # the kernel refuses this fillet: 10 mm, written as the material it adds along each edge
    with BuildSketch(Plane(origin=(10, 0, -47.5), x_dir=(0, 0, -1), z_dir=(0, 1, 0))) as fillet1_piece_1:
        with BuildLine():
            CenterArc((9.136363636, 5.813741203), FILLET1_R, 196.899093783, 18.648155306)
            Line((-0.431818182, 2.906870602), (-0.623181818, 2.84873319))
            ThreePointArc((-0.623181818, 2.84873319), (-0.306372759, 1.439996843), (-0.2, 0))
            Line((-0.2, 0), (0, -0.2))
            ThreePointArc((0, -0.2), (0.5, -0.2), (0.837272727, -0.116274824))
            Line((0.837272727, -0.116274824), (1, 0))
        make_face()
    extrude(amount=4.5)
    with BuildSketch(Plane(origin=(54, 24.826506038, -47.5), x_dir=(0, 0, -1), z_dir=(0, -1, 0))) as fillet1_piece_2_section:
        with BuildLine():
            CenterArc((9.136363636, 5.813741203), FILLET1_R, 196.899093783, 18.648155306)
            Line((-0.431818182, 2.906870602), (-0.623181818, 2.84873319))
            ThreePointArc((-0.623181818, 2.84873319), (-0.306372759, 1.439996843), (-0.2, 0))
            Line((-0.2, 0), (0, -0.2))
            ThreePointArc((0, -0.2), (0.5, -0.2), (0.837272727, -0.116274824))
            Line((0.837272727, -0.116274824), (1, 0))
        make_face()
    fillet1_piece_2 = extrude(amount=24.826506038, mode=Mode.PRIVATE)
    fillet1_piece_2 = fillet1_piece_2 - Plane(origin=(48.5, 20, -47.589405223), x_dir=(0.9090909090908866, -0.41659779045058, 0), z_dir=(0, 0, -1)) * Cylinder(6.05, 62, mode=Mode.PRIVATE)
    fillet1_piece_2 = split(fillet1_piece_2, bisect_by=Plane(origin=(54.911060016, 19.9, -47.589405223), z_dir=(0, -1, 0)), keep=Keep.TOP, mode=Mode.PRIVATE)
    add(fillet1_piece_2)

    # Sketch18 → Cut-Extrude15 (cut)
    with BuildSketch(Plane(origin=(0, 4.5, 0), x_dir=(1, 0, 0), z_dir=(0, 1, 0)).offset(CUT_EXTRUDE15_START)):
        with Locations(Location((13, 14.25, 0), (0, 0, 270))):
            Circle(SKETCH18_R)
        with Locations((8, 17.25)):
            Rectangle(SKETCH18_W, SKETCH18_H)
        with BuildLine():
            Line((16.75, 19.25), (13.75, 19.25))
            Line((13.75, 19.25), (13.75, 15.77561463))
            ThreePointArc((13.75, 15.77561463), (14.443086969, 15.148610038), (14.7, 14.25))
            ThreePointArc((14.7, 14.25), (14.443086969, 13.351389962), (13.75, 12.72438537))
            Line((13.75, 12.72438537), (13.75, 9.25))
            Line((13.75, 9.25), (16.75, 9.25))
            Line((16.75, 9.25), (16.75, 19.25))
        make_face()
    extrude(amount=CUT_EXTRUDE15_DEPTH, mode=Mode.SUBTRACT)

    # Sketch19 → Cut-Extrude16 (cut)
    with BuildSketch(Plane(origin=(0, 0, -48.5), x_dir=(-1, 0, 0), z_dir=(0, 0, -1)).offset(CUT_EXTRUDE16_START)):
        with Locations((-48.5, 20)):
            Circle(SKETCH19_R)
    extrude(amount=CUT_EXTRUDE16_DEPTH, mode=Mode.SUBTRACT)


solid = part.part
